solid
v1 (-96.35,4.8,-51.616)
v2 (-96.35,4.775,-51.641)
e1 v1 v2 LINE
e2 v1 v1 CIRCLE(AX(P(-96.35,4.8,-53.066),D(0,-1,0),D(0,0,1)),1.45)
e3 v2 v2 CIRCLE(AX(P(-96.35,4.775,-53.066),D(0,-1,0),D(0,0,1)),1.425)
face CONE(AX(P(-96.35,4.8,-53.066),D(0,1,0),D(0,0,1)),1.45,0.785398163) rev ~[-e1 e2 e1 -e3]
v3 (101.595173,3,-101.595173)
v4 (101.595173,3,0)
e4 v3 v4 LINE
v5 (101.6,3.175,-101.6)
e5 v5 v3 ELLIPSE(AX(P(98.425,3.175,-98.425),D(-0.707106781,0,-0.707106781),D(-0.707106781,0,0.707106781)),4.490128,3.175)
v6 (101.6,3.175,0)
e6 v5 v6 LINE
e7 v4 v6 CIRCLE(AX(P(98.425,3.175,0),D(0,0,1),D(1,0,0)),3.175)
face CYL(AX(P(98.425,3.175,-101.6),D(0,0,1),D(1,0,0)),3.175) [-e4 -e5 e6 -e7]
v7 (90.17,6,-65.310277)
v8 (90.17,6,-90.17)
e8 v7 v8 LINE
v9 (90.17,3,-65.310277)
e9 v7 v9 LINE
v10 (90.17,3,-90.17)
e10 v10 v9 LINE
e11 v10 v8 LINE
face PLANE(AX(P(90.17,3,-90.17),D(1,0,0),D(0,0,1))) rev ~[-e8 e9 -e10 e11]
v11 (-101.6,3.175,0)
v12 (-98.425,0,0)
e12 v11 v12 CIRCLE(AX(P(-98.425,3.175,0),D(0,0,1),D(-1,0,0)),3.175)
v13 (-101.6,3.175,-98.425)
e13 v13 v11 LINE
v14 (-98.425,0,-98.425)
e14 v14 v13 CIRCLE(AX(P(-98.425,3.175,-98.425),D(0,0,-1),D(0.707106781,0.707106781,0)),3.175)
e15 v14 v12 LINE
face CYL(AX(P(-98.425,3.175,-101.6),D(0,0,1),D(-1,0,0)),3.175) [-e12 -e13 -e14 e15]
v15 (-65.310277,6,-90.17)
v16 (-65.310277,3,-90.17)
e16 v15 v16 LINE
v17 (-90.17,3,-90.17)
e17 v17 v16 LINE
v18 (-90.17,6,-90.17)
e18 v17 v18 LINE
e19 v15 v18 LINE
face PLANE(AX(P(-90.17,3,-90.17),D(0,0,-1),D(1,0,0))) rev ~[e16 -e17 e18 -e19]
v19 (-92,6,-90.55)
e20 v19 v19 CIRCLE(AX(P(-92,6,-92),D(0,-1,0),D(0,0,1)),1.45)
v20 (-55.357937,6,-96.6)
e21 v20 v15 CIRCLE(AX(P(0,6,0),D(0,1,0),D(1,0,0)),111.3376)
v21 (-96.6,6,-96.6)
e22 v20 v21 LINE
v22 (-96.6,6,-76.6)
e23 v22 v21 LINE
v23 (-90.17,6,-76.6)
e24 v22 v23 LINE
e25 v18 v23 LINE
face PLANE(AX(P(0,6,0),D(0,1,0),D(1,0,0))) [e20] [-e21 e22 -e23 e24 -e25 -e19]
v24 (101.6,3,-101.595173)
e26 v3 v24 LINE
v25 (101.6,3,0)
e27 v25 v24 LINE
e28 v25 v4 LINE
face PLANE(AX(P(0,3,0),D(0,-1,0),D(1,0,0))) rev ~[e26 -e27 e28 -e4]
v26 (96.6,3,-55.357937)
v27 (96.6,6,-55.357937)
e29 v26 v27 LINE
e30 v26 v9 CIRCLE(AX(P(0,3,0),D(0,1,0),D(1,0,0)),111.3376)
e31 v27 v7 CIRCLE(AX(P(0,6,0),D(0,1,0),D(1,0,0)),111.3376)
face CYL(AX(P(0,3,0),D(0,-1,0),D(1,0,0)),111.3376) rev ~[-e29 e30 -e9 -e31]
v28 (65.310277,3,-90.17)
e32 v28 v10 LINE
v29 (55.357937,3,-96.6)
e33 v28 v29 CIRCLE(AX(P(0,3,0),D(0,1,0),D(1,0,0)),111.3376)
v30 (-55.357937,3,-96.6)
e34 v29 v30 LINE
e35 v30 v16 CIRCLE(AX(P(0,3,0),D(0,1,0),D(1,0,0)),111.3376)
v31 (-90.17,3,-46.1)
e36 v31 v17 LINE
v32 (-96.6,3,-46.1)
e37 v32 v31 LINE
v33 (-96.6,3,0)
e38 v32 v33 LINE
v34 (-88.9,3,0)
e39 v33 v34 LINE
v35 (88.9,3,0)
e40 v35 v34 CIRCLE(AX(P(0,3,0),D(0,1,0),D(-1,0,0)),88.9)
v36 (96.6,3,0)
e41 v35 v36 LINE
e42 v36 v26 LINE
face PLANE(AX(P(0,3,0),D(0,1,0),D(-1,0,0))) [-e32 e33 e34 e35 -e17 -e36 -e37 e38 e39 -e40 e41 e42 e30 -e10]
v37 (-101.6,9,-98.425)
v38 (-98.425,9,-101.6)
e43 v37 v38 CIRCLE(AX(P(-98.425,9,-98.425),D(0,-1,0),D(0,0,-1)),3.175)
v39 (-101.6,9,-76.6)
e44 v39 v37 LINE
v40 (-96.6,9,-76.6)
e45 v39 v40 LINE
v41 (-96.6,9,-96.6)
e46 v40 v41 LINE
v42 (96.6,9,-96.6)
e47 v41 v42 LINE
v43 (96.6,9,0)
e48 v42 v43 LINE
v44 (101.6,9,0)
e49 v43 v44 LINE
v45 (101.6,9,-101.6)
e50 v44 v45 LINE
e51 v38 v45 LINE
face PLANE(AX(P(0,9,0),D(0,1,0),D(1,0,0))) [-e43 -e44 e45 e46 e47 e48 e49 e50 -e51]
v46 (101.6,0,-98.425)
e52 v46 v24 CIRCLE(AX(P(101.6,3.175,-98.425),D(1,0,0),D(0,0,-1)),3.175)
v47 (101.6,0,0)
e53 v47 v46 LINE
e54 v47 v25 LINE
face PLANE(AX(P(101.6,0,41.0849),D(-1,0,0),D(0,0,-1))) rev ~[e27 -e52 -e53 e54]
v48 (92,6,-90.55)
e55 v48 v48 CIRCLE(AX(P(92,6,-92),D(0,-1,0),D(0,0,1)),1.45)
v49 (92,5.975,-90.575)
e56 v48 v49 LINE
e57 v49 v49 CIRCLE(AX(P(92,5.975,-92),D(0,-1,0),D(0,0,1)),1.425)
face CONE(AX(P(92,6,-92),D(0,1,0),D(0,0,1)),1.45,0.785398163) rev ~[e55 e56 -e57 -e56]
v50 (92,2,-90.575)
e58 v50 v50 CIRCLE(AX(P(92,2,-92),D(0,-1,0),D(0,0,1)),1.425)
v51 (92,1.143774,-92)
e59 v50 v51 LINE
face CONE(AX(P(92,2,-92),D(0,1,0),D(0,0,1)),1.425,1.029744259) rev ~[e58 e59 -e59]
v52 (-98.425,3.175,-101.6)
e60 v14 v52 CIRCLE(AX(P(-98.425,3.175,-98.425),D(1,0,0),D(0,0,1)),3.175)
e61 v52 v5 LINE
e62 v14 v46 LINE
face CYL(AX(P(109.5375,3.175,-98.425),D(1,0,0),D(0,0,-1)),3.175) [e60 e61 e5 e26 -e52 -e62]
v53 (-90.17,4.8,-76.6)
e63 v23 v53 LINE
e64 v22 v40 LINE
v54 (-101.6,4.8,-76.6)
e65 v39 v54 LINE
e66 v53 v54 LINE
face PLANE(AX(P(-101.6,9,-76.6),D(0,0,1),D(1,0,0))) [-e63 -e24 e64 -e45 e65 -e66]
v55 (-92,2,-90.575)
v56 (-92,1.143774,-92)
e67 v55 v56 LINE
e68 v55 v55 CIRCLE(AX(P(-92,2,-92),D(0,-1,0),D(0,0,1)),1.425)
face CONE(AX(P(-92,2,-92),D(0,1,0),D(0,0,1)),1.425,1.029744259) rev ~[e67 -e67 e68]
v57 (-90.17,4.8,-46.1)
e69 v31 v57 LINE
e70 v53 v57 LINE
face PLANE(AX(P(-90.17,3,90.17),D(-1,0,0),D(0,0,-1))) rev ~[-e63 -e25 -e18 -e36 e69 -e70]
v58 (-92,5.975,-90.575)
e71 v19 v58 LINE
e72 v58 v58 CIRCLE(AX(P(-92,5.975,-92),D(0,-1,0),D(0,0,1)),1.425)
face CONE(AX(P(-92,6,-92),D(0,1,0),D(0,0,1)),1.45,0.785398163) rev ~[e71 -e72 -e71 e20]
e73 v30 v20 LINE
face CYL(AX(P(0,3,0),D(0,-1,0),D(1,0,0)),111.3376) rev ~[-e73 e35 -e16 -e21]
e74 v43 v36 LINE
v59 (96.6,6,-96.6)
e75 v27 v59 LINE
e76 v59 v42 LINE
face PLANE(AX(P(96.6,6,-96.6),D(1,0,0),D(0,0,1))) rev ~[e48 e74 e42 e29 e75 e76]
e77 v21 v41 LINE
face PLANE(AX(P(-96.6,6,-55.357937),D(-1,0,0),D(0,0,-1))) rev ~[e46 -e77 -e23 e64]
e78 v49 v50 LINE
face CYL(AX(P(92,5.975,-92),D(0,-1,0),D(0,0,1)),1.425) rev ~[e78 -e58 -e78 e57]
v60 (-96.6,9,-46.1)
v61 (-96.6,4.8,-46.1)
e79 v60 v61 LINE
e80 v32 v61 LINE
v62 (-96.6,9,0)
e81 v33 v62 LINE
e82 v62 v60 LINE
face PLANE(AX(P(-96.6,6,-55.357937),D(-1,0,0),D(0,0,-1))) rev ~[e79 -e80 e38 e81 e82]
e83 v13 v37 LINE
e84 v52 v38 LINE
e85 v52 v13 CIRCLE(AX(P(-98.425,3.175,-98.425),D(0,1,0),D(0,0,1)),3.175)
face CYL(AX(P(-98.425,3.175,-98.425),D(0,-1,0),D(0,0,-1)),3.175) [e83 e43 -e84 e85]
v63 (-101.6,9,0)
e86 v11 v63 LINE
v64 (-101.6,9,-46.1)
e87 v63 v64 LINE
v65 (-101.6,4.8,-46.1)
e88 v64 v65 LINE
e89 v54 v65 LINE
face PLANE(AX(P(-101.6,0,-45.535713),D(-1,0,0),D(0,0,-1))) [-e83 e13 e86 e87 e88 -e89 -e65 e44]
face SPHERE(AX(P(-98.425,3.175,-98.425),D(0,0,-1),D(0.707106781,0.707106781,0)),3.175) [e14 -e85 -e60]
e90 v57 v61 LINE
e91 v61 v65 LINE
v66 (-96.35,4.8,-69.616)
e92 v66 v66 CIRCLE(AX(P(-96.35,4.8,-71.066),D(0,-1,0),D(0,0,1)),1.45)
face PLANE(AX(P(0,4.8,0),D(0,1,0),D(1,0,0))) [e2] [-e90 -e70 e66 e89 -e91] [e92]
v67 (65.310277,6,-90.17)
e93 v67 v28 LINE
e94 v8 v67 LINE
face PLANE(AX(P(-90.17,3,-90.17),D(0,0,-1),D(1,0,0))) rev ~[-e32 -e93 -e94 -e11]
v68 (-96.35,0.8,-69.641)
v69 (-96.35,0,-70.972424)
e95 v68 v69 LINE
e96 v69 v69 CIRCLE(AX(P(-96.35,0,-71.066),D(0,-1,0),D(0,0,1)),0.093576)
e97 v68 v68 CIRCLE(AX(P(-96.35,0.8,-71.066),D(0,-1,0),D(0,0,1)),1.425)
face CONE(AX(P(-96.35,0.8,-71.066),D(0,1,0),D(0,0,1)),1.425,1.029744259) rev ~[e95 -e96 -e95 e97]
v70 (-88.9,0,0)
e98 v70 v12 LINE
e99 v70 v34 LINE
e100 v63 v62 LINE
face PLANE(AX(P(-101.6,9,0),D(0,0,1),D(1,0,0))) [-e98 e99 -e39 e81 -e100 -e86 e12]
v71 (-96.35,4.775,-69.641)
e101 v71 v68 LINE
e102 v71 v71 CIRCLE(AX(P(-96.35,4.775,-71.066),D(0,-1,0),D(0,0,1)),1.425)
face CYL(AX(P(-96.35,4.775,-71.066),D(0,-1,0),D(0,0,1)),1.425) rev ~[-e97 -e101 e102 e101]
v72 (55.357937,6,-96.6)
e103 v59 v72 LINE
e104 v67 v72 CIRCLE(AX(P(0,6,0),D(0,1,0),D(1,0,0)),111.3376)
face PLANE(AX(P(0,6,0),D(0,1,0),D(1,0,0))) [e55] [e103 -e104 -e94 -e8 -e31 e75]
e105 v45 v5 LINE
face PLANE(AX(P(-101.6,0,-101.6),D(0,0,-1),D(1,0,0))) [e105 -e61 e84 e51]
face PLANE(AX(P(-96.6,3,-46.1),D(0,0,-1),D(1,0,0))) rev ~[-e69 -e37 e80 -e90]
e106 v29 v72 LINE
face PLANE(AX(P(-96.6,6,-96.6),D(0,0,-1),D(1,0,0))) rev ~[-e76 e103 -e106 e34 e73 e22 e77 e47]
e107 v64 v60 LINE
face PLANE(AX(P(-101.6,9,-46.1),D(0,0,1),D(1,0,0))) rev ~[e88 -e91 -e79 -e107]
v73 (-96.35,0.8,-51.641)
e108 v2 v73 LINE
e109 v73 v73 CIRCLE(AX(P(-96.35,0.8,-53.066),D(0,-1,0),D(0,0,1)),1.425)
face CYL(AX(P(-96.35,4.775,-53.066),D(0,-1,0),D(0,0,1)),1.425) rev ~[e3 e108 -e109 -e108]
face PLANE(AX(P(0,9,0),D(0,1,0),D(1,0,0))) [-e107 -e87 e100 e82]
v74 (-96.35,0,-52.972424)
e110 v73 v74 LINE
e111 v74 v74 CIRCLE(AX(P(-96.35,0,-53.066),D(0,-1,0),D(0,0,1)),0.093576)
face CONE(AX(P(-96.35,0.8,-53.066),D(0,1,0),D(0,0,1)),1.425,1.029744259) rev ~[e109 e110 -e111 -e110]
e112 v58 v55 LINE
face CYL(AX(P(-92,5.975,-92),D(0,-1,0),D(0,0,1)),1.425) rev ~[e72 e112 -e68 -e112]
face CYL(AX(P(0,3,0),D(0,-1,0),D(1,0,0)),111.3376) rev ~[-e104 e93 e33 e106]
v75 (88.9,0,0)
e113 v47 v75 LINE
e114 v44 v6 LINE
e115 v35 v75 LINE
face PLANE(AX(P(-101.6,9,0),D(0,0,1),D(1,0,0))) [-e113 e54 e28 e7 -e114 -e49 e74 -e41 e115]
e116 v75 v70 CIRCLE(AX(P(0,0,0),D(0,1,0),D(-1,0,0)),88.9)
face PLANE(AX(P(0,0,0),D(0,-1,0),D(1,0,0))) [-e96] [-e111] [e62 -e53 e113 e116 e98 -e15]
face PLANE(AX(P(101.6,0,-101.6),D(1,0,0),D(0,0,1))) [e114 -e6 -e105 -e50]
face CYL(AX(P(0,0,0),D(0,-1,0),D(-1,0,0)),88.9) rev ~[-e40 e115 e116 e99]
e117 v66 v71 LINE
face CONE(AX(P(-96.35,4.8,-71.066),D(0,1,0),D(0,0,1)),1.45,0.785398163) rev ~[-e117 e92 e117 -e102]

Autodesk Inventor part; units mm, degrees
ref_plane "YZ Plane" through (0, 0, 0) normal (1, 0, 0) x (0, 1, 0)
ref_plane "XZ Plane" through (0, 0, 0) normal (0, 1, 0) x (-1, 0, 0)
ref_plane "XY Plane" through (0, 0, 0) normal (0, 0, 1) x (1, 0, 0)
sketch "Sketch1" plane through (0, 0, 0) normal (0, 1, 0) x (-1, 0, 0)
  line L0 (101.6, -101.6) -> (-101.6, -101.6)
  line L1 (-101.6, -101.6) -> (-101.6, 101.6)
  line L2 (-101.6, 101.6) -> (101.6, 101.6)
  line L3 (101.6, 101.6) -> (101.6, -101.6)
  line L4 (96.6, -96.6) -> (-96.6, -96.6)
  line L5 (-96.6, -96.6) -> (-96.6, 96.6)
  line L6 (-96.6, 96.6) -> (96.6, 96.6)
  line L7 (96.6, 96.6) -> (96.6, -96.6)
  line L8 (101.6, 101.6) -> (-40.4, 101.6)
  circle A0 centre (0, 0) radius 88.9
  circle A1 centre (0, 0) radius 109.3376
  line L9 (-40.4, 101.6) -> (-101.6, 40.4)
  line L10 (-45.4, 101.6) -> (-101.6, 45.4)
  line L11 (96.6, 96.6) -> (96.6, 101.6)
  line L12 (-45.4, 101.6) -> (-35.4, 101.6)
  line L13 (-35.4, 101.6) -> (-35.4, 96.6)
  line L14 (-35.4, 96.6) -> (-45.4, 96.6)
  line L15 (-45.4, 96.6) -> (-45.4, 101.6)
  circle A2 centre (0, 0) radius 111.3376
  point P0 (96.6, 51.2168)
  point P1 (101.6, 40.4)
  point P2 (101.6, -40.4)
  point P3 (96.6, -51.2168)
  point P4 (-96.6, 45.4)
  point P5 (-45.4, 96.6)
  dimension "d0" = 203.2
  dimension "d1" = 203.2
  dimension "d2" = 101.6
  dimension "d3" = 101.6
  dimension "d4" = 5
  dimension "d5" = 5
  dimension "d6" = 5
  dimension "d7" = 5
  dimension "d10" = 142
  dimension "d12" = 61.2
  dimension "d14" = 177.8
  dimension "d15" = 5
  dimension "d16" = 5
  dimension "d17" = 10
  dimension "d34" = 2
extrude "Extrusion1" add sketch "Sketch1" along normal blind 3 contours L0 A2 L4 L7 L3 | L0 A1 L4 A2 | A2 L7 A1 L3 | L0 A1 L4 | A2 L4 A1 L0 | L0 L1 A2 L5 L4 | A2 L7 L4 | L4 A1 L7 A2 | A1 L7 L3 | L4 A1 L5 L9 L6 L7 | A2 L5 A1 L4 | L4 L5 A2 | A1 L7 A2 L3 | A2 L7 L11 L2 L3 | L1 A1 L5 A2 | A1 L6 A2 L7 | A2 L6 L7 | A1 L1 L9 L5 | A1 L2 A2 L6 | L6 L13 L2 A1 | L11 L6 A2 L2 | L9 A1 L10 L5 | L5 L10 L6 L9 | L1 L10 A1 | L6 L9 L2 L13 | L15 A1 L9 | L6 L10 A1 L15 | A1 L15 L2 | A1 L10 L15
sketch "Sketch5" plane through (0, 3, 0) normal (0, 1, 0) x (1, 0, 0)
  line L0 (-101.6, 101.6) -> (101.6, 101.6)
  line L1 (101.6, 101.6) -> (101.6, -101.6)
  line L2 (101.6, -101.6) -> (-101.6, -101.6)
  line L3 (-101.6, -101.6) -> (-101.6, 101.6)
  line L4 (-96.6, 96.6) -> (96.6, 96.6)
  line L5 (96.6, 96.6) -> (96.6, -96.6)
  line L6 (96.6, -96.6) -> (-96.6, -96.6)
  line L7 (-96.6, -96.6) -> (-96.6, 96.6)
  line L8 (-101.6, -101.6) -> (40.4, -101.6)
  circle A0 centre (0, 0) radius 88.9
  circle A1 centre (0, 0) radius 109.3376
  line L9 (40.4, -101.6) -> (101.6, -40.4)
  line L10 (45.4, -101.6) -> (101.6, -45.4)
  line L11 (-96.6, -96.6) -> (-96.6, -101.6)
  line L12 (45.4, -101.6) -> (35.4, -101.6)
  line L13 (35.4, -101.6) -> (35.4, -96.6)
  line L14 (35.4, -96.6) -> (45.4, -96.6)
  line L15 (45.4, -96.6) -> (45.4, -101.6)
  circle A2 centre (0, 0) radius 111.3376
  point P0 (96.6, 101.6)
  point P1 (96.6, 51.2168)
  point P2 (101.6, 40.4)
  point P3 (101.6, -40.4)
  point P4 (96.6, -51.2168)
  point P5 (-96.6, 45.4)
  point P6 (-45.4, 96.6)
  point P7 (-35.4, 101.6)
  point P8 (-55.358, -96.6)
  point P9 (-96.6, -55.358)
  point P10 (-96.6, 55.358)
  point P11 (-55.358, 96.6)
  point P12 (55.358, 96.6)
  point P13 (96.6, 55.358)
  point P14 (96.6, -45.4)
  point P15 (45.4, -96.6)
  dimension "d37" = 203.2
  dimension "d38" = 203.2
  dimension "d39" = 101.6
  dimension "d40" = 101.6
  dimension "d41" = 5
  dimension "d42" = 5
  dimension "d43" = 5
  dimension "d44" = 5
  dimension "d45" = 142
  dimension "d46" = 61.2
  dimension "d47" = 177.8
  dimension "d48" = 5
  dimension "d49" = 5
  dimension "d50" = 10
  dimension "d51" = 2
extrude "Extrusion4" add sketch "Sketch5" along normal blind 3 contours L0 A2 L4 L7 L3 | L0 A1 L4 A2 | A2 L7 A1 L3 | L0 A1 L4 | A2 L4 A1 L0 | L0 L1 A2 L5 L4 | A2 L7 L4 | A1 L7 L3 | A2 L7 L11 L2 L3 | L3 A1 L7 A2 | L4 L5 A2 | A2 L6 L7 | L1 A1 L5 A2 | L11 L6 A2 L2 | L6 A1 L2 A2 | A1 L1 L9 L5 | L6 L13 L2 A1 | L9 A1 L10 L5 | L5 L10 L6 L9 | L1 L10 A1 | L6 L9 L2 L13 | L15 A1 L9 | L6 L10 A1 L15 | A1 L15 L2 | L15 A1 L10
sketch "Sketch6" plane through (0, 6, 0) normal (0, 1, 0) x (1, 0, 0)
  line L0 (-101.6, 101.6) -> (101.6, 101.6)
  line L1 (101.6, 101.6) -> (101.6, -101.6)
  line L2 (101.6, -101.6) -> (-101.6, -101.6)
  line L3 (-101.6, -101.6) -> (-101.6, 101.6)
  line L4 (-96.6, 96.6) -> (96.6, 96.6)
  line L5 (96.6, 96.6) -> (96.6, -96.6)
  line L6 (96.6, -96.6) -> (-96.6, -96.6)
  line L7 (-96.6, -96.6) -> (-96.6, 96.6)
  line L8 (-101.6, -101.6) -> (40.4, -101.6)
  circle A0 centre (0, 0) radius 88.9
  circle A1 centre (0, 0) radius 109.3376
  line L9 (40.4, -101.6) -> (101.6, -40.4)
  line L10 (45.4, -101.6) -> (101.6, -45.4)
  line L11 (-96.6, -96.6) -> (-96.6, -101.6)
  line L12 (45.4, -101.6) -> (35.4, -101.6)
  line L13 (35.4, -101.6) -> (35.4, -96.6)
  line L14 (35.4, -96.6) -> (45.4, -96.6)
  line L15 (45.4, -96.6) -> (45.4, -101.6)
  circle A2 centre (0, 0) radius 111.3376
  point P0 (96.6, 101.6)
  point P1 (96.6, 51.2168)
  point P2 (101.6, 40.4)
  point P3 (101.6, -40.4)
  point P4 (96.6, -51.2168)
  point P5 (-96.6, 45.4)
  point P6 (-45.4, 96.6)
  point P7 (-35.4, 101.6)
  point P8 (55.358, 96.6)
  point P9 (96.6, 55.358)
  point P10 (96.6, -45.4)
  point P11 (45.4, -96.6)
  dimension "d54" = 203.2
  dimension "d55" = 203.2
  dimension "d56" = 101.6
  dimension "d57" = 101.6
  dimension "d58" = 5
  dimension "d59" = 5
  dimension "d60" = 5
  dimension "d61" = 5
  dimension "d62" = 142
  dimension "d63" = 61.2
  dimension "d64" = 177.8
  dimension "d65" = 5
  dimension "d66" = 5
  dimension "d67" = 10
  dimension "d68" = 2
extrude "Extrusion5" add sketch "Sketch6" along normal blind 3 contours L0 A2 L4 L7 L3 | L0 A1 L4 A2 | A2 L7 A1 L3 | L0 A1 L4 | A2 L4 A1 L0 | L0 L1 A2 L5 L4 | A1 L7 L3 | A2 L7 L11 L2 L3 | L3 A1 L7 A2 | L1 A1 L5 A2 | L11 L6 A2 L2 | L6 A1 L2 A2 | A1 L1 L9 L5 | L6 L13 L2 A1 | L9 A1 L10 L5 | L5 L10 L6 L9 | L1 L10 A1 | L6 L9 L2 L13 | L15 A1 L9 | L6 L10 A1 L15 | A1 L15 L2 | L15 A1 L10
fillet "Fillet6" radius 3.175 5 edges at (-28.1, 0, 101.6) (73.5, 0, 73.5) (101.6, 0, -28.1) (0, 0, -101.6) (-101.6, 0, 0)
sketch "Sketch7" plane through (0, 0, 0) normal (0, -1, 0) x (1, 0, 0)
  line L0 (101.6, 45.4) -> (101.6, -101.6) projected
  line L1 (98.425, 44.0849) -> (98.425, -98.425) projected
  line L2 (101.6, -101.6) -> (98.425, -101.6)
  line L3 (98.425, -101.6) -> (98.425, 41.0849)
  line L4 (98.425, 41.0849) -> (101.6, 41.0849)
  line L5 (101.6, 41.0849) -> (101.6, -101.6)
  line L6 (44.0849, 98.425) -> (98.425, 44.0849) projected
  line L7 (98.425, 44.0849) -> (101.6, 44.0849)
  point P0 (0, 0)
  point P1 (101.6, 41.0849)
  dimension "d73" = 3
extrude "Extrusion6" add sketch "Sketch7" against normal blind 3 contours L0 L2 L3 L1 L4
fillet "Fillet7" radius 3.175 1 edges at (100.0125, 0, -101.6)
fillet "Fillet8" radius 3.175 4 edges at (-100.6701, 0.9299, 100.6701) (-101.6, 6.0875, 101.6) (-100.6701, 0.9299, -100.6701) (-101.6, 6.0875, -101.6)
fillet "Fillet9" radius 3.175 4 edges at (100.6701, 0.9299, 45.0148) (101.6, 6.0875, 45.4) (45.0148, 0.9299, 100.6701) (45.4, 6.0875, 101.6)
sketch "Sketch11" plane through (0, 3, 0) normal (0, 1, 0) x (1, 0, 0)
  arc A0 (-101.6, -98.425) -> (-98.425, -101.6) centre (-98.425, -98.425) ccw
  line L0 (44.0849, 101.6) -> (-98.425, 101.6)
  line L1 (-101.6, 98.425) -> (-101.6, -98.425)
  line L2 (-101.6, -46.1) -> (-101.6, -76.6)
  line L3 (-96.6, -96.6) -> (-96.6, 96.6)
  line L4 (-96.6, -46.1) -> (-96.6, -76.6)
  line L5 (-101.6, -76.6) -> (-96.6, -76.6)
  line L6 (-101.6, -46.1) -> (-96.6, -46.1)
  line L7 (-98.425, -101.6) -> (101.6, -101.6)
  line L8 (0, 0) -> (-101.6, 0)
  line L9 (-101.6, 46.1) -> (-101.6, 76.6)
  line L10 (-96.6, 46.1) -> (-96.6, 76.6)
  line L11 (-101.6, 76.6) -> (-96.6, 76.6)
  line L12 (-101.6, 46.1) -> (-96.6, 46.1)
  line L13 (-96.6, -76.6) -> (-90.1, -76.6)
  line L14 (-90.1, -76.6) -> (-90.1, -46.1)
  line L15 (-90.1, -46.1) -> (-96.6, -46.1)
  line L16 (-96.6, -46.1) -> (-96.6, -76.6)
  line L17 (-96.6, 46.1) -> (-90.1, 46.1)
  line L18 (-90.1, 46.1) -> (-90.1, 76.6)
  line L19 (-90.1, 76.6) -> (-96.6, 76.6)
  line L20 (-96.6, 76.6) -> (-96.6, 46.1)
  point P0 (-98.425, 98.425)
  point P1 (46.1, 101.6)
  point P2 (46.1, 96.6)
  point P3 (76.6, 96.6)
  point P4 (76.6, 101.6)
  point P5 (-46.1, 96.6)
  point P6 (-96.6, -46.1)
  point P7 (-101.6, 46.1)
  point P8 (-96.6, 46.1)
  point P9 (-96.6, 76.6)
  point P10 (-101.6, 76.6)
  point P11 (-96.6, 76.6)
  dimension "d97" = 30.5
  dimension "d98" = 25
  dimension "d99" = 5
  dimension "d100" = 6.5
  dimension "d101" = 6.5
extrude "Extrusion8" add sketch "Sketch11" along normal up to surface (3 mm away) contours L19 L18 L17 L3 | L15 L14 L13 L3
sketch "Sketch8" plane through (0, 9, 0) normal (0, 1, 0) x (1, 0, 0)
  arc A0 (-101.6, -98.425) -> (-98.425, -101.6) centre (-98.425, -98.425) ccw
  line L0 (44.0849, 101.6) -> (-98.425, 101.6)
  line L1 (-101.6, 98.425) -> (-101.6, -98.425)
  line L2 (-101.6, -46.1) -> (-101.6, -76.6)
  line L3 (-96.6, -96.6) -> (-96.6, 96.6)
  line L4 (-96.6, -46.1) -> (-96.6, -76.6)
  line L5 (-101.6, -76.6) -> (-96.6, -76.6)
  line L6 (-101.6, -46.1) -> (-96.6, -46.1)
  line L7 (-98.425, -101.6) -> (101.6, -101.6)
  line L8 (0, 0) -> (-101.6, 0)
  line L9 (-101.6, 46.1) -> (-101.6, 76.6)
  line L10 (-96.6, 46.1) -> (-96.6, 76.6)
  line L11 (-101.6, 76.6) -> (-96.6, 76.6)
  line L12 (-101.6, 46.1) -> (-96.6, 46.1)
  line L13 (-96.6, -76.6) -> (-90.1, -76.6)
  line L14 (-90.1, -76.6) -> (-90.1, -46.1)
  line L15 (-90.1, -46.1) -> (-96.6, -46.1)
  line L16 (-96.6, -46.1) -> (-96.6, -76.6)
  line L17 (-96.6, 46.1) -> (-90.1, 46.1)
  line L18 (-90.1, 46.1) -> (-90.1, 76.6)
  line L19 (-90.1, 76.6) -> (-96.6, 76.6)
  line L20 (-96.6, 76.6) -> (-96.6, 46.1)
  point P0 (-98.425, 98.425)
  point P1 (46.1, 101.6)
  point P2 (46.1, 96.6)
  point P3 (76.6, 96.6)
  point P4 (76.6, 101.6)
  point P5 (-46.1, 96.6)
  point P6 (-96.6, -46.1)
  point P7 (-101.6, 46.1)
  point P8 (-96.6, 46.1)
  point P9 (-96.6, 76.6)
  point P10 (-101.6, 76.6)
  point P11 (-96.6, 76.6)
  dimension "d77" = 30.5
  dimension "d78" = 25
  dimension "d79" = 5
  dimension "d82" = 6.5
  dimension "d83" = 6.5
extrude "Extrusion7" cut sketch "Sketch8" against normal blind 4.2 contours L11 L3 L12 L1 | L19 L18 L17 L3 | L6 L3 L5 L1 | L15 L14 L13 L3
sketch "Sketch10" plane through (0, 4.8, 0) normal (0, 1, 0) x (1, 0, 0)
  line L0 (-90.1, -76.6) -> (-90.1, -46.1)
  line L1 (-101.6, -46.1) -> (-96.6, -46.1)
  line L2 (-90.1, -76.6) -> (-90.1, -46.1)
  line L3 (-90.1, -46.1) -> (-101.6, -46.1)
  line L4 (-101.6, -46.1) -> (-101.6, -76.6)
  line L5 (-101.6, -76.6) -> (-90.1, -76.6)
  line L6 (-96.6, -76.6) -> (-90.1, -76.6)
  line L7 (-91.1, -76.6) -> (-91.1, -46.1)
  line L8 (-91.1, -62.066) -> (-96.35, -62.066)
  line L9 (-96.35, -62.066) -> (-96.35, -71.066)
  line L10 (-96.35, -62.066) -> (-96.35, -53.066)
  circle A0 centre (-96.35, -53.066) radius 1
  circle A1 centre (-96.35, -71.066) radius 1
  line L11 (0, 0) -> (-101.6, 0)
  line L12 (-101.6, 98.425) -> (-101.6, -98.425)
  circle A2 centre (-96.35, 71.066) radius 1
  line L13 (-96.35, 62.066) -> (-96.35, 71.066)
  line L14 (-91.1, 62.066) -> (-96.35, 62.066)
  line L15 (-101.6, 76.6) -> (-90.1, 76.6)
  line L16 (-96.35, 62.066) -> (-96.35, 53.066)
  circle A3 centre (-96.35, 53.066) radius 1
  line L17 (-101.6, 46.1) -> (-96.6, 46.1)
  line L18 (-90.1, 46.1) -> (-101.6, 46.1)
  line L19 (-91.1, 76.6) -> (-91.1, 46.1)
  line L20 (-101.6, 46.1) -> (-101.6, 76.6)
  line L21 (-90.1, 76.6) -> (-90.1, 46.1)
  line L22 (-90.1, 76.6) -> (-90.1, 46.1)
  line L23 (-96.6, 76.6) -> (-90.1, 76.6)
  dimension "d84" = 1
  dimension "d85" = 5.25
  dimension "d86" = 9
  dimension "d87" = 9
  dimension "d88" = 2
  dimension "d89" = 2
hole "Hinge Holes" at (-96.35, 4.8, -71.066) at (-96.35, 4.8, -53.066) at (-96.35, 4.8, 71.066) at (-96.35, 4.8, 53.066) direction (0, -1, 0) diameter 2.85 depth 4 tip angle 118 countersink diameter 2.9 countersink angle 90 thread size "M3.5x0.6" class "6H" standard "ANSI Metric M Profile"
sketch "Sketch12" plane through (0, 6, 0) normal (0, 1, 0) x (1, 0, 0)
  line L0 (-92, 92) -> (92, 92)
  line L1 (92, 92) -> (92, -92)
  line L2 (92, -92) -> (-92, -92)
  line L3 (-92, -92) -> (-92, 92)
  circle A0 centre (-92, 92) radius 1
  circle A1 centre (92, 92) radius 1
  circle A2 centre (-92, -92) radius 1
  point P0 (0, 0)
  dimension "d104" = 92
  dimension "d105" = 92
  dimension "d106" = 92
  dimension "d107" = 92
  dimension "d108" = 2
  dimension "d109" = 2
  dimension "d110" = 2
hole "Assembly Holes" at (-92, 6, 92) at (-92, 6, -92) at (92, 6, -92) direction (0, -1, 0) diameter 2.85 depth 4 tip angle 118 countersink diameter 2.9 countersink angle 90 thread size "M3.5x0.6" class "6H" standard "ANSI Metric M Profile"
sketch "Sketch15" plane through (0, 3, 0) normal (0, 1, 0) x (1, 0, 0)
  line L0 (-90.17, 90.17) -> (90.17, 90.17)
  line L1 (90.17, 90.17) -> (90.17, -90.17)
  line L2 (90.17, -90.17) -> (-90.17, -90.17)
  line L3 (-90.17, -90.17) -> (-90.17, 90.17)
  line L4 (45.2687, -90.17) -> (90.17, -45.2687)
  point P0 (0, 0)
  dimension "d126" = 90.17
  dimension "d127" = 90.17
  dimension "d128" = 90.17
  dimension "d129" = 90.17
  dimension "d130" = 31.75
extrude "Extrusion9" cut sketch "Sketch15" along normal blind 10 contours L0 L1 L4 L2 L3
sketch "Sketch16" plane through (0, 9, 0) normal (0, 1, 0) x (1, 0, 0)
  line L0 (-101.6, -98.425) -> (-101.6, 98.425) projected
  line L1 (-101.6, 0) -> (101.6, 0)
  line L2 (101.6, 101.6) -> (101.6, -44.0849) projected
  point P0 (0, 0)
ref_plane "Work Plane1" through (-101.6, 9, 0) normal (0, 0, 1) x (1, 0, 0)
sketch "Sketch17" plane through (-101.6, 9, 0) normal (0, 0, 1) x (1, 0, 0)
  line L0 (-12.9177, 20.3635) -> (224.9268, 20.3635)
  line L1 (224.9268, 20.3635) -> (224.9268, -33.2249)
  line L2 (224.9268, -33.2249) -> (-12.9177, -33.2249)
  line L3 (-12.9177, -33.2249) -> (-12.9177, 20.3635)
  point P0 (101.6, -9)
extrude "Extrusion10" cut sketch "Sketch17" along normal blind 2540
equation "\"d1\" = d0"
equation "\"d2\" = 0.5 * d0"
equation "\"d3\" = 0.5 * d0"
equation "\"d38\" = d37"
equation "\"d39\" = 0.5 * d37"
equation "\"d40\" = 0.5 * d37"
properties part number "Box_Walls_2"
